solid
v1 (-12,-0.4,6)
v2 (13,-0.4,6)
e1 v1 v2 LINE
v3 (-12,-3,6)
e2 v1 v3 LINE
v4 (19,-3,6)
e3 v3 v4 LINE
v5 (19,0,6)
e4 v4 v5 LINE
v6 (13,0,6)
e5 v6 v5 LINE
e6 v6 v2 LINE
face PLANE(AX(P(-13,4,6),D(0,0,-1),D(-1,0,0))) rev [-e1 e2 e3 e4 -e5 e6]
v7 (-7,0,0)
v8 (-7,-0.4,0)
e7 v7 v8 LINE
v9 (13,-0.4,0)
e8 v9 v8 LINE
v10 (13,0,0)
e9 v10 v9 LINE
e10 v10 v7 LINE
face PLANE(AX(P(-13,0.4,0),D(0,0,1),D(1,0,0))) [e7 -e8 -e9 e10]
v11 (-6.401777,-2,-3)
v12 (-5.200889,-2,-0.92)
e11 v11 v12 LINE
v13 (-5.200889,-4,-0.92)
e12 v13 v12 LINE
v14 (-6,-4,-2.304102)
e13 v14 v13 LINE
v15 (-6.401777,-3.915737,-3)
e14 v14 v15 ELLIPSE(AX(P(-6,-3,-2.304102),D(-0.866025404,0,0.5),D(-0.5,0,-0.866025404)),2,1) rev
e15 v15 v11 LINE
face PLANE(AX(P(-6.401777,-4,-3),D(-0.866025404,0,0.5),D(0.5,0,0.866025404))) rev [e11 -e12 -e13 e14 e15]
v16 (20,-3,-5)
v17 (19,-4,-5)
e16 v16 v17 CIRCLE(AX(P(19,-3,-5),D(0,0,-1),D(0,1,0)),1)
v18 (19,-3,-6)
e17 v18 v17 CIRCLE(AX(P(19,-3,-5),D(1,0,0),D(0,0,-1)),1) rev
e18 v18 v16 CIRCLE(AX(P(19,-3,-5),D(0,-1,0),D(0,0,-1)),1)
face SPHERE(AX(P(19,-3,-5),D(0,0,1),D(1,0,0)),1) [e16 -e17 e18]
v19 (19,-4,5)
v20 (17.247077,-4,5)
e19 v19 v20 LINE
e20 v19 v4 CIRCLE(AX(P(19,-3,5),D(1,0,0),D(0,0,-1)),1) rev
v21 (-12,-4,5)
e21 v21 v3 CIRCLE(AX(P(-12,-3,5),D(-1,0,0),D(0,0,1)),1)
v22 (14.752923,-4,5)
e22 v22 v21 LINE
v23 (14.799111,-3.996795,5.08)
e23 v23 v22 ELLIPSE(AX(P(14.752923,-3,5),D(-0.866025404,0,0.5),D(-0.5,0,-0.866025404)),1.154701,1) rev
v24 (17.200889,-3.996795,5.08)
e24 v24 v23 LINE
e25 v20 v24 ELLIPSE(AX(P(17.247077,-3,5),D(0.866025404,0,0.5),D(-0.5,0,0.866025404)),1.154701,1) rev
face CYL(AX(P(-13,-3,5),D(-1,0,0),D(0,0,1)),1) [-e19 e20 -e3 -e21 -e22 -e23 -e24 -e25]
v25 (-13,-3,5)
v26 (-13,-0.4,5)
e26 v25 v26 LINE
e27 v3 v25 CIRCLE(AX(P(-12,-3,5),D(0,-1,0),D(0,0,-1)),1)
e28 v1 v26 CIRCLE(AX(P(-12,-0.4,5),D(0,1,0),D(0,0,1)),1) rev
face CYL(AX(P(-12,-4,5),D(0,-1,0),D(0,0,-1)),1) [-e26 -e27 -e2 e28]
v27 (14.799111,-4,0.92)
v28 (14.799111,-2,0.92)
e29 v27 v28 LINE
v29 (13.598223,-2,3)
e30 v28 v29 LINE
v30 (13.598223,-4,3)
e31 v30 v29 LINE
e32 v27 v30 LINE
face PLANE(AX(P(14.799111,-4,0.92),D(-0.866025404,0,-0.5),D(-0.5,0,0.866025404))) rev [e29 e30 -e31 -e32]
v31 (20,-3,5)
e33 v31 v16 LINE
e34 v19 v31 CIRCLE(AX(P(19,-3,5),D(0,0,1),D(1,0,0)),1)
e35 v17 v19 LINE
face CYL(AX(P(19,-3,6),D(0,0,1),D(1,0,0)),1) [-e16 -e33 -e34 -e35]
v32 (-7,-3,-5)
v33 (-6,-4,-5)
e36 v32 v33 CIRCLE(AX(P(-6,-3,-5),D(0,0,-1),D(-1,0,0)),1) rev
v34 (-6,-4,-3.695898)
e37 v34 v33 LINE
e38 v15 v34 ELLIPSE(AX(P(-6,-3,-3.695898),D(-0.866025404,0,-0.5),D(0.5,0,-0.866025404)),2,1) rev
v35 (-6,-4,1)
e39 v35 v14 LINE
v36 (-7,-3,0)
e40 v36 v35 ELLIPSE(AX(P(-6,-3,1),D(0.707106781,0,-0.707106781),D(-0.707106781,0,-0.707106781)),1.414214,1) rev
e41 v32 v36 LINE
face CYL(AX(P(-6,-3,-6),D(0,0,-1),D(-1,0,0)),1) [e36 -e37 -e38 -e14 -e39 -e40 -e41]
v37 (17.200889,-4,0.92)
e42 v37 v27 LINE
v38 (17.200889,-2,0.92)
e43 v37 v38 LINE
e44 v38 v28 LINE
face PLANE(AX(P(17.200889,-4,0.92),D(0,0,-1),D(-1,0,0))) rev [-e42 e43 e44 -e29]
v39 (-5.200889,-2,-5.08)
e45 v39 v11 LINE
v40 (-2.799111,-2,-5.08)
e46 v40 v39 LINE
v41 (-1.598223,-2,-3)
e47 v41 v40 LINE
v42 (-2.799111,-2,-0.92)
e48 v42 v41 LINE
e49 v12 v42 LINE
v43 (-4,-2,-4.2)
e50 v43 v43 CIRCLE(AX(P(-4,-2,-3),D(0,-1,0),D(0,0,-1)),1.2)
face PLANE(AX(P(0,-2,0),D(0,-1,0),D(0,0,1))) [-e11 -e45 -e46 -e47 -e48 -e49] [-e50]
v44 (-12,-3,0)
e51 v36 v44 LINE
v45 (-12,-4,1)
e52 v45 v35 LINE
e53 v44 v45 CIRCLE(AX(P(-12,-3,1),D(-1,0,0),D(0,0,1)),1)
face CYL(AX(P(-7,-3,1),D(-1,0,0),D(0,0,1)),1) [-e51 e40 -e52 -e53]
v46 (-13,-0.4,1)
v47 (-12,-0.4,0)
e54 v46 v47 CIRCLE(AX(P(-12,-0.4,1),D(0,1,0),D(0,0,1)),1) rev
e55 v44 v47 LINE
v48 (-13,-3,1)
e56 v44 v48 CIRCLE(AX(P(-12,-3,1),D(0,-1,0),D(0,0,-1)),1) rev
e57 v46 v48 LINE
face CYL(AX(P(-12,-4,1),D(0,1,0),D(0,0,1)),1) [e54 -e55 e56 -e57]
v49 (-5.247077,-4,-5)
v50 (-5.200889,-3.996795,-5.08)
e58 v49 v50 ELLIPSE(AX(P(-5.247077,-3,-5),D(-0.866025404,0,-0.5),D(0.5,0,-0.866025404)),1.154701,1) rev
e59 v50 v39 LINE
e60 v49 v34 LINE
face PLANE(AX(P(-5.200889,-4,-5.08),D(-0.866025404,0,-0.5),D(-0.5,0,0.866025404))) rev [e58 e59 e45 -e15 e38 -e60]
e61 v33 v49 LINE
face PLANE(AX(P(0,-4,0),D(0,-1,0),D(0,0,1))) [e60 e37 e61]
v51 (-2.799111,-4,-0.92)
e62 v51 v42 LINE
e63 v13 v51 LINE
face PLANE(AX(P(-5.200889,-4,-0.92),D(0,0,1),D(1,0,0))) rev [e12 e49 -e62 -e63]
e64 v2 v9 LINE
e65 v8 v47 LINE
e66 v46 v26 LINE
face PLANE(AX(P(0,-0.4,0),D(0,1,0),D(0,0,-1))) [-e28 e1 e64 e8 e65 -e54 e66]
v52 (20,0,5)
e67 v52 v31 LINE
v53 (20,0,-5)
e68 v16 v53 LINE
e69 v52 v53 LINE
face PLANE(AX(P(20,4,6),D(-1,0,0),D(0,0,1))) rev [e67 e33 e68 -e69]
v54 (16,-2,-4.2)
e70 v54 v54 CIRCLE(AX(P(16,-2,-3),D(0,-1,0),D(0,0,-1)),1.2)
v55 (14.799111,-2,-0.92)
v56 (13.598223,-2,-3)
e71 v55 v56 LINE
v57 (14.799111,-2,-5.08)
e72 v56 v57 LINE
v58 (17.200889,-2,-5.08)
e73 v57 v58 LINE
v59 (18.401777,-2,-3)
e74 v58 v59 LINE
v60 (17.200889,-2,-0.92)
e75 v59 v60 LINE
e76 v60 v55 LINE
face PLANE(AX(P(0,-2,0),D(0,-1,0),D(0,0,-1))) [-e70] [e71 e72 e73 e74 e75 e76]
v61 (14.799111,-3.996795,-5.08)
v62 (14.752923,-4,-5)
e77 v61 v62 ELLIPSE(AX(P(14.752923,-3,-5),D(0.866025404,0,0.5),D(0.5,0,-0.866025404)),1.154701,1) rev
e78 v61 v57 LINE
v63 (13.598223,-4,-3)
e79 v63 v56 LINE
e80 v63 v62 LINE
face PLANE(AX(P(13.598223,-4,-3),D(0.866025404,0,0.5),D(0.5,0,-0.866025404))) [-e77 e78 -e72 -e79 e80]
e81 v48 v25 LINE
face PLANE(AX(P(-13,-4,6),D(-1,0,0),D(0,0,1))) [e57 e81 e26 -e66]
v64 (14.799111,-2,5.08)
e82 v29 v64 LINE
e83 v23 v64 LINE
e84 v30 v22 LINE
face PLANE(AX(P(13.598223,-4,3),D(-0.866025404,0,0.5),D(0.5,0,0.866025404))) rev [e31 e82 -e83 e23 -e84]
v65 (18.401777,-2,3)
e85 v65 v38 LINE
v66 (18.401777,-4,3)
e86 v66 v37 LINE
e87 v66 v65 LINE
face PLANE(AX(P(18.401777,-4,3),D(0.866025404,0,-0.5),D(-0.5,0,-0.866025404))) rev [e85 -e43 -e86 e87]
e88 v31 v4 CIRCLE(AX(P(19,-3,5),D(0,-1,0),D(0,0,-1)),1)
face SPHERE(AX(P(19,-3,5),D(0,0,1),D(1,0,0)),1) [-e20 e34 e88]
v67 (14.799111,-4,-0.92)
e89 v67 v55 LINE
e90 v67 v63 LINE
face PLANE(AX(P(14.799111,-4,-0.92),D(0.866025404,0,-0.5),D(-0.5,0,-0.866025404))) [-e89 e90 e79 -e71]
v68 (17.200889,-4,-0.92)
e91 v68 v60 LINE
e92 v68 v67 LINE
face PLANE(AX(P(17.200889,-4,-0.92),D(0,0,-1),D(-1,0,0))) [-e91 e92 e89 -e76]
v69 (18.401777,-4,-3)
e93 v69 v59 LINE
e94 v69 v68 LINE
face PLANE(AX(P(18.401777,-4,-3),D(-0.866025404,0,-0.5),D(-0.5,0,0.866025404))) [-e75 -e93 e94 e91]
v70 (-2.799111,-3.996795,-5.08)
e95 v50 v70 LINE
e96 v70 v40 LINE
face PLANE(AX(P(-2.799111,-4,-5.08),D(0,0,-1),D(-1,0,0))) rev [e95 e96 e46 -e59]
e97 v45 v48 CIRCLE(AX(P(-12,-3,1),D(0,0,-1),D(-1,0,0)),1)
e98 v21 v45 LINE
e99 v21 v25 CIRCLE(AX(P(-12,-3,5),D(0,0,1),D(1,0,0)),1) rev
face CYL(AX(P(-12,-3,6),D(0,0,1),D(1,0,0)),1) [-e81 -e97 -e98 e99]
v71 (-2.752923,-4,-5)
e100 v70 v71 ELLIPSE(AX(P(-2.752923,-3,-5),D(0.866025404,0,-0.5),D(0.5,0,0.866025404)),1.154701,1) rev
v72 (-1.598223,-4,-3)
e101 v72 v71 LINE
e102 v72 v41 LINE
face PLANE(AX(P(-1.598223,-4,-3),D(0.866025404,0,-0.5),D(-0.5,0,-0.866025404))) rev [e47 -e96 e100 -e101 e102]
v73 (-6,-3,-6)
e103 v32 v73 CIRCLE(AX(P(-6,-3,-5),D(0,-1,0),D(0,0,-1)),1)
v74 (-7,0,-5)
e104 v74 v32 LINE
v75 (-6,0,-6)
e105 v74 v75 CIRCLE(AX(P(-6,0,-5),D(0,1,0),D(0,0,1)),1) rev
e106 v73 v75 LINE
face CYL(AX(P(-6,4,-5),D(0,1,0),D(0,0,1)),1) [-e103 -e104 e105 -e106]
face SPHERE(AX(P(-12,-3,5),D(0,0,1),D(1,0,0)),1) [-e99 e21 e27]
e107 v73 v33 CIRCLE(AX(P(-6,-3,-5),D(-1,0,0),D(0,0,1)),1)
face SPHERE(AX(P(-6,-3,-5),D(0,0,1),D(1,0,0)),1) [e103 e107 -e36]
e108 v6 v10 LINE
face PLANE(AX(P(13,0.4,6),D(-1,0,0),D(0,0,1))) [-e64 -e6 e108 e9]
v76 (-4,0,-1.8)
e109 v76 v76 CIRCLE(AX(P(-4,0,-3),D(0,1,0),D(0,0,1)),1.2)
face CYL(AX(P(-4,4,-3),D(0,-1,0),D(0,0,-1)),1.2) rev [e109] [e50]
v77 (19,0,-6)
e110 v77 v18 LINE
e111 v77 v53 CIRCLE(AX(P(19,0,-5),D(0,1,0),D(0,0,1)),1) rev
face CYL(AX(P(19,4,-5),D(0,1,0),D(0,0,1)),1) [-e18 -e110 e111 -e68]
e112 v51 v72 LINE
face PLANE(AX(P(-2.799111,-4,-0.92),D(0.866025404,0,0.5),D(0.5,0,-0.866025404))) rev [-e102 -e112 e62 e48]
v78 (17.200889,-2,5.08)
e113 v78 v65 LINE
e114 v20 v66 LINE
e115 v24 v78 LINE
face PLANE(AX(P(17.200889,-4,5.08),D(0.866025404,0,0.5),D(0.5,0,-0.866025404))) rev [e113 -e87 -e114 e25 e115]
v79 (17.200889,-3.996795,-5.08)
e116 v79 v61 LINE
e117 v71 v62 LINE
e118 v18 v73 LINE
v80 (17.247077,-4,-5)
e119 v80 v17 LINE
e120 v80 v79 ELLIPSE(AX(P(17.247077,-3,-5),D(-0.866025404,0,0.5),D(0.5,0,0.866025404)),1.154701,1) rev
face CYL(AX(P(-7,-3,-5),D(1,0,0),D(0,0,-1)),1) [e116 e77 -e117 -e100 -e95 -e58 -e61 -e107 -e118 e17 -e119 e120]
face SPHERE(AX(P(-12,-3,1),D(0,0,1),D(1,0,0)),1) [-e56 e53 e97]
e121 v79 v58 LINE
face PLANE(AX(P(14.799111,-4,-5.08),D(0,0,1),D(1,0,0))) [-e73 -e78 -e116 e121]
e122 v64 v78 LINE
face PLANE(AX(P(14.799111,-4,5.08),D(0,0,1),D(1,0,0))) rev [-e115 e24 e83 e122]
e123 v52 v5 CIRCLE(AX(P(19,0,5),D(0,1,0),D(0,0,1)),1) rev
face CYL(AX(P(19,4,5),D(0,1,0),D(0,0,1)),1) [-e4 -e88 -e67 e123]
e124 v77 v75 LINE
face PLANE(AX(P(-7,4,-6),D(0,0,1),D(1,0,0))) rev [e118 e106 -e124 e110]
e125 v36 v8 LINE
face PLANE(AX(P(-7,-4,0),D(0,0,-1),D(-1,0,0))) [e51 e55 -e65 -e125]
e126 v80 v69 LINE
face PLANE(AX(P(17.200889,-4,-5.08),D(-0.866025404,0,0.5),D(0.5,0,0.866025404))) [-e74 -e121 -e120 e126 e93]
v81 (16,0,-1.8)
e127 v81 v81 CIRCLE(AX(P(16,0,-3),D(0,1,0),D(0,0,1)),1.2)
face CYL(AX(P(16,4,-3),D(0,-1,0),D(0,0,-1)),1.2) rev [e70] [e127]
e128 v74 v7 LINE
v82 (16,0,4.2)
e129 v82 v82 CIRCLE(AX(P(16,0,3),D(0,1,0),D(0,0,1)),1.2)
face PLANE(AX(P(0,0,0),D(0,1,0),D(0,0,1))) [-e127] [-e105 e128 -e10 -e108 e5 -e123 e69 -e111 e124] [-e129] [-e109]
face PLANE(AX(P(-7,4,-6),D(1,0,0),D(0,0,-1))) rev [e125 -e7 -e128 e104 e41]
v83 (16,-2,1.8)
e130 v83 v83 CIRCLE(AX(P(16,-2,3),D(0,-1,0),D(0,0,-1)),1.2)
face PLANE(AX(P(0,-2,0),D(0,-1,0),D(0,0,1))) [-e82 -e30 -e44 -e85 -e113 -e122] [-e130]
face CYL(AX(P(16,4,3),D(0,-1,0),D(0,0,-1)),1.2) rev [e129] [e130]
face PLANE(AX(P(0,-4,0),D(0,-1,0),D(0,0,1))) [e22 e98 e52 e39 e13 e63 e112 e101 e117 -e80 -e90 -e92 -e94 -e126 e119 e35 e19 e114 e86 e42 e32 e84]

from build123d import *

# Parameters (mm, degrees)
EXTRUDE_1_DEPTH        = 4
CUT_EXTRUDE_START      = 2
CUT_EXTRUDE_2_DEPTH    = 2
CUT_EXTRUDE_3_DEPTH    = 2
SKETCH_4_R             = 1.2
CUT_EXTRUDE_4_DEPTH    = 22.260291625
FILLET_1_R             = 1
SKETCH_6_W             = 26
SKETCH_6_H             = 6
CUT_EXTRUDE_8_DEPTH    = 0.4
MIRROR_START           = 2
MIRROR_2_COPY_1_DEPTH  = 2
FILLET_1_OF_MIRROR_2_R = 1
SKETCH_8_W             = 60.520940054
SKETCH_8_H             = 38.044112249
CUT_EXTRUDE_10_DEPTH   = 26


with BuildPart() as part:
    # 草圖1 → 填料-伸長1 (new body)
    with BuildSketch(Plane(origin=(0, 0, 0), x_dir=(1, 0, 0), z_dir=(0, 1, 0))):
        Polygon((-13, -6), (20, -6), (20, 6), (-7, 6), (-7, 0), (-13, 0), align=None)
    extrude_1 = extrude(amount=EXTRUDE_1_DEPTH)

    # 草圖2 → 除料-伸長2 (cut)
    with BuildSketch(Plane(origin=(0, 0, 0), x_dir=(1, 0, 0), z_dir=(0, 1, 0)).offset(CUT_EXTRUDE_START)):
        Polygon((-1.59822288, 3), (-2.79911144, 5.08), (-5.20088856, 5.08), (-6.40177712, 3), (-5.20088856, 0.92), (-2.79911144, 0.92), align=None)
    cut_extrude_2 = extrude(amount=CUT_EXTRUDE_2_DEPTH, mode=Mode.SUBTRACT)

    # 草圖3 → 除料-伸長3 (cut)
    with BuildSketch(Plane(origin=(0, 0, 0), x_dir=(1, 0, 0), z_dir=(0, 1, 0)).offset(CUT_EXTRUDE_START)):
        Polygon((13.59822288, -3), (14.79911144, -5.08), (17.20088856, -5.08), (18.40177712, -3), (17.20088856, -0.92), (14.79911144, -0.92), align=None)
    cut_extrude_3 = extrude(amount=CUT_EXTRUDE_3_DEPTH, mode=Mode.SUBTRACT)

    # 草圖4 → 除料-伸長4 (cut, through all)
    with BuildSketch(Plane(origin=(0, 0, 0), x_dir=(1, 0, 0), z_dir=(0, 1, 0))):
        with Locations(Location((-4, 3, 0), (0, 0, 270))):
            Circle(SKETCH_4_R)
        with Locations(Location((16, 3, 0), (0, 0, 90))):
            Circle(SKETCH_4_R)
        with Locations(Location((16, -3, 0), (0, 0, 270))):
            Circle(SKETCH_4_R)
    cut_extrude_4 = extrude(amount=CUT_EXTRUDE_4_DEPTH, mode=Mode.SUBTRACT)

    # 圓角1
    # the kernel refuses this fillet: 1 mm, written as the material it takes off along each edge
    with BuildSketch(Plane(origin=(-6, 3, -5), x_dir=(0, 0, -1), z_dir=(0, 1, 0))) as fillet_1_piece_1_section:
        Polygon((0, 0), (FILLET_1_R, 0), (FILLET_1_R, FILLET_1_R), (0, FILLET_1_R), align=None)
    fillet_1_piece_1 = extrude(amount=FILLET_1_R, mode=Mode.PRIVATE)
    fillet_1_piece_1 = fillet_1_piece_1 - Plane(origin=(-6, 3, -5), x_dir=(0.7071067811865476, 0, 0.7071067811865474), z_dir=(0, 1, 0)) * Sphere(FILLET_1_R, mode=Mode.PRIVATE)
    add(fillet_1_piece_1, mode=Mode.SUBTRACT)
    with BuildSketch(Plane(origin=(-12, 3, 1), x_dir=(0, 1, 0), z_dir=(-1, 0, 0))) as fillet_1_piece_2_section:
        Polygon((0, 0), (FILLET_1_R, 0), (FILLET_1_R, FILLET_1_R), (0, FILLET_1_R), align=None)
    fillet_1_piece_2 = extrude(amount=FILLET_1_R, mode=Mode.PRIVATE)
    fillet_1_piece_2 = fillet_1_piece_2 - Plane(origin=(-12, 3, 1), x_dir=(0, -0.7071067811865475, 0.7071067811865475), z_dir=(-1, 0, 0)) * Sphere(FILLET_1_R, mode=Mode.PRIVATE)
    add(fillet_1_piece_2, mode=Mode.SUBTRACT)
    with BuildSketch(Plane(origin=(-12, 3, 5), x_dir=(-1, 0, 0), z_dir=(0, 0, 1))) as fillet_1_piece_3_section:
        Polygon((0, 0), (FILLET_1_R, 0), (FILLET_1_R, -FILLET_1_R), (0, -FILLET_1_R), align=None)
    fillet_1_piece_3 = extrude(amount=FILLET_1_R, mode=Mode.PRIVATE)
    fillet_1_piece_3 = fillet_1_piece_3 - Plane(origin=(-12, 3, 5), x_dir=(0.7071067811865475, -0.7071067811865475, 0), z_dir=(0, 0, 1)) * Sphere(FILLET_1_R, mode=Mode.PRIVATE)
    add(fillet_1_piece_3, mode=Mode.SUBTRACT)
    with BuildSketch(Plane(origin=(19, 3, 5), x_dir=(1, 0, 0), z_dir=(0, 0, 1))) as fillet_1_piece_4_section:
        Polygon((0, 0), (FILLET_1_R, 0), (FILLET_1_R, FILLET_1_R), (0, FILLET_1_R), align=None)
    fillet_1_piece_4 = extrude(amount=FILLET_1_R, mode=Mode.PRIVATE)
    fillet_1_piece_4 = fillet_1_piece_4 - Plane(origin=(19, 3, 5), x_dir=(-0.7071067811865475, -0.7071067811865475, 0), z_dir=(0, 0, 1)) * Sphere(FILLET_1_R, mode=Mode.PRIVATE)
    add(fillet_1_piece_4, mode=Mode.SUBTRACT)
    with BuildSketch(Plane(origin=(19, 3, -5), x_dir=(0, 1, 0), z_dir=(1, 0, 0))) as fillet_1_piece_5_section:
        Polygon((0, 0), (FILLET_1_R, 0), (FILLET_1_R, -FILLET_1_R), (0, -FILLET_1_R), align=None)
    fillet_1_piece_5 = extrude(amount=FILLET_1_R, mode=Mode.PRIVATE)
    fillet_1_piece_5 = fillet_1_piece_5 - Plane(origin=(19, 3, -5), x_dir=(0, -0.7071067811865475, 0.7071067811865475), z_dir=(1, 0, 0)) * Sphere(FILLET_1_R, mode=Mode.PRIVATE)
    add(fillet_1_piece_5, mode=Mode.SUBTRACT)
    with BuildSketch(Plane(origin=(-7, 4, -5), x_dir=(1, 0, 0), z_dir=(0, 0, 1)), Plane(origin=(-7, 4, 0), x_dir=(0, 0, 1), z_dir=(-1, 0, 0))) as fillet_1_piece_6:
        with BuildLine():
            CenterArc((FILLET_1_R, -FILLET_1_R), FILLET_1_R, 90, 90)
            Line((0, -FILLET_1_R), (0, 0))
            Line((0, 0), (FILLET_1_R, 0))
        make_face()
    extrude(amount=5, mode=Mode.SUBTRACT)
    with BuildSketch(Plane(origin=(-13, 4, 1), x_dir=(0, -1, 0), z_dir=(0, 0, 1))) as fillet_1_piece_7:
        with BuildLine():
            CenterArc((FILLET_1_R, FILLET_1_R), FILLET_1_R, 180, 90)
            Line((0, FILLET_1_R), (0, 0))
            Line((0, 0), (FILLET_1_R, 0))
        make_face()
    extrude(amount=4, mode=Mode.SUBTRACT)
    with BuildSketch(Plane(origin=(-12, 4, 6), x_dir=(0, -1, 0), z_dir=(1, 0, 0))) as fillet_1_piece_8:
        with BuildLine():
            CenterArc((FILLET_1_R, FILLET_1_R), FILLET_1_R, 180, 90)
            Line((0, FILLET_1_R), (0, 0))
            Line((0, 0), (FILLET_1_R, 0))
        make_face()
    extrude(amount=31, mode=Mode.SUBTRACT)
    with BuildSketch(Plane(origin=(20, 4, 5), x_dir=(0, -1, 0), z_dir=(0, 0, -1))) as fillet_1_piece_9:
        with BuildLine():
            CenterArc((FILLET_1_R, FILLET_1_R), FILLET_1_R, 180, 90)
            Line((0, FILLET_1_R), (0, 0))
            Line((0, 0), (FILLET_1_R, 0))
        make_face()
    extrude(amount=10, mode=Mode.SUBTRACT)
    with BuildSketch(Plane(origin=(19, 4, -6), x_dir=(0, 0, 1), z_dir=(-1, 0, 0))) as fillet_1_piece_10:
        with BuildLine():
            CenterArc((FILLET_1_R, -FILLET_1_R), FILLET_1_R, 90, 90)
            Line((0, -FILLET_1_R), (0, 0))
            Line((0, 0), (FILLET_1_R, 0))
        make_face()
    extrude(amount=25, mode=Mode.SUBTRACT)
    with BuildSketch(Plane(origin=(-13, -2.5, 0), x_dir=(0, 0, 1), z_dir=(0, 1, 0)), Plane(origin=(-13, -2.5, 6), x_dir=(1, 0, 0), z_dir=(0, 1, 0))) as fillet_1_piece_11:
        with BuildLine():
            CenterArc((FILLET_1_R, FILLET_1_R), FILLET_1_R, 180, 90)
            Line((0, FILLET_1_R), (0, 0))
            Line((0, 0), (FILLET_1_R, 0))
        make_face()
    extrude(amount=5.5, mode=Mode.SUBTRACT)
    with BuildSketch(Plane(origin=(20, -2.5, 6), x_dir=(-1, 0, 0), z_dir=(0, 1, 0)), Plane(origin=(20, -2.5, -6), x_dir=(0, 0, 1), z_dir=(0, 1, 0)), Plane(origin=(-7, -2.5, -6), x_dir=(1, 0, 0), z_dir=(0, 1, 0))) as fillet_1_piece_12:
        with BuildLine():
            CenterArc((FILLET_1_R, -FILLET_1_R), FILLET_1_R, 90, 90)
            Line((0, -FILLET_1_R), (0, 0))
            Line((0, 0), (FILLET_1_R, 0))
        make_face()
    extrude(amount=5.5, mode=Mode.SUBTRACT)
    with BuildSketch(Plane(origin=(-4.5, 4, 0), x_dir=(0, 0, 1), z_dir=(-1, 0, 0))) as fillet_1_piece_13a_section:
        with BuildLine():
            CenterArc((FILLET_1_R, -FILLET_1_R), FILLET_1_R, 90, 90)
            Line((0, -FILLET_1_R), (0, 0))
            Line((0, 0), (FILLET_1_R, 0))
        make_face()
    fillet_1_piece_13a = extrude(amount=7.5, mode=Mode.PRIVATE)
    fillet_1_piece_13a = split(fillet_1_piece_13a, bisect_by=Plane(origin=(-7, 3.773604886, 0.226395114), z_dir=(1, 0, 0)), keep=Keep.TOP, mode=Mode.PRIVATE)
    with BuildSketch(Plane(origin=(-7, 4, -5), x_dir=(1, 0, 0), z_dir=(0, 0, 1))) as fillet_1_piece_13b_section:
        with BuildLine():
            CenterArc((FILLET_1_R, -FILLET_1_R), FILLET_1_R, 90, 90)
            Line((0, -FILLET_1_R), (0, 0))
            Line((0, 0), (FILLET_1_R, 0))
        make_face()
    fillet_1_piece_13b = extrude(amount=7.5, mode=Mode.PRIVATE)
    fillet_1_piece_13b = split(fillet_1_piece_13b, bisect_by=Plane(origin=(-6.773604886, 3.773604886, 0), z_dir=(0, 0, 1)), keep=Keep.TOP, mode=Mode.PRIVATE)
    fillet_1_piece_13 = fillet_1_piece_13a & fillet_1_piece_13b
    add(fillet_1_piece_13, mode=Mode.SUBTRACT)

    # 草圖6 → 除料-伸長8 (cut)
    with BuildSketch(Plane(origin=(0, 0, 0), x_dir=(1, 0, 0), z_dir=(0, 1, 0))):
        with Locations((0, -3)):
            Rectangle(SKETCH_6_W, SKETCH_6_H)
    cut_extrude_8 = extrude(amount=CUT_EXTRUDE_8_DEPTH, mode=Mode.SUBTRACT)

    # 鏡射3: 除料-伸長3 across plane
    add(cut_extrude_3.mirror(Plane(origin=(-7, 4, 0), x_dir=(1, 0, 0), z_dir=(0, 0, 1))), mode=Mode.SUBTRACT)

    # 鏡射2: 填料-伸長1, 除料-伸長2, 除料-伸長3, 除料-伸長4, 除料-伸長8 across plane
    add(extrude_1.mirror(Plane.ZX))
    add(cut_extrude_2.mirror(Plane.ZX), mode=Mode.SUBTRACT)
    add(cut_extrude_3.mirror(Plane.ZX), mode=Mode.SUBTRACT)
    add(cut_extrude_4.mirror(Plane.ZX), mode=Mode.SUBTRACT)
    add(cut_extrude_8.mirror(Plane.ZX), mode=Mode.SUBTRACT)

    # 鏡射2 copy 1 sketch → 鏡射2 copy 1 (cut)
    with BuildSketch(Plane.XZ.offset(MIRROR_START)):
        Polygon((13.59822288, -3), (14.79911144, -5.08), (17.20088856, -5.08), (18.40177712, -3), (17.20088856, -0.92), (14.79911144, -0.92), align=None)
    extrude(amount=MIRROR_2_COPY_1_DEPTH, mode=Mode.SUBTRACT)

    # 圓角1 of 鏡射2
    # the kernel refuses this fillet: 1 mm, written as the material it takes off along each edge
    with BuildSketch(Plane(origin=(-6, -3, -5), x_dir=(0, -1, 0), z_dir=(-1, 0, 0))) as fillet_1_of_mirror_2_piece_1_section:
        Polygon((0, 0), (FILLET_1_OF_MIRROR_2_R, 0), (FILLET_1_OF_MIRROR_2_R, -FILLET_1_OF_MIRROR_2_R), (0, -FILLET_1_OF_MIRROR_2_R), align=None)
    fillet_1_of_mirror_2_piece_1 = extrude(amount=FILLET_1_OF_MIRROR_2_R, mode=Mode.PRIVATE)
    fillet_1_of_mirror_2_piece_1 = fillet_1_of_mirror_2_piece_1 - Plane(origin=(-6, -3, -5), x_dir=(0, 0.7071067811865475, 0.7071067811865475), z_dir=(-1, 0, 0)) * Sphere(FILLET_1_OF_MIRROR_2_R, mode=Mode.PRIVATE)
    add(fillet_1_of_mirror_2_piece_1, mode=Mode.SUBTRACT)
    with BuildSketch(Plane(origin=(-12, -3, 1), x_dir=(0, -1, 0), z_dir=(0, 0, -1))) as fillet_1_of_mirror_2_piece_2_section:
        Polygon((0, 0), (FILLET_1_OF_MIRROR_2_R, 0), (FILLET_1_OF_MIRROR_2_R, FILLET_1_OF_MIRROR_2_R), (0, FILLET_1_OF_MIRROR_2_R), align=None)
    fillet_1_of_mirror_2_piece_2 = extrude(amount=FILLET_1_OF_MIRROR_2_R, mode=Mode.PRIVATE)
    fillet_1_of_mirror_2_piece_2 = fillet_1_of_mirror_2_piece_2 - Plane(origin=(-12, -3, 1), x_dir=(0.7071067811865475, 0.7071067811865475, 0), z_dir=(0, 0, -1)) * Sphere(FILLET_1_OF_MIRROR_2_R, mode=Mode.PRIVATE)
    add(fillet_1_of_mirror_2_piece_2, mode=Mode.SUBTRACT)
    with BuildSketch(Plane(origin=(-12, -3, 5), x_dir=(0, -1, 0), z_dir=(0, 0, 1))) as fillet_1_of_mirror_2_piece_3_section:
        Polygon((0, 0), (FILLET_1_OF_MIRROR_2_R, 0), (FILLET_1_OF_MIRROR_2_R, -FILLET_1_OF_MIRROR_2_R), (0, -FILLET_1_OF_MIRROR_2_R), align=None)
    fillet_1_of_mirror_2_piece_3 = extrude(amount=FILLET_1_OF_MIRROR_2_R, mode=Mode.PRIVATE)
    fillet_1_of_mirror_2_piece_3 = fillet_1_of_mirror_2_piece_3 - Plane(origin=(-12, -3, 5), x_dir=(0.7071067811865475, 0.7071067811865475, 0), z_dir=(0, 0, 1)) * Sphere(FILLET_1_OF_MIRROR_2_R, mode=Mode.PRIVATE)
    add(fillet_1_of_mirror_2_piece_3, mode=Mode.SUBTRACT)
    with BuildSketch(Plane(origin=(19, -3, 5), x_dir=(1, 0, 0), z_dir=(0, 0, 1))) as fillet_1_of_mirror_2_piece_4_section:
        Polygon((0, 0), (FILLET_1_OF_MIRROR_2_R, 0), (FILLET_1_OF_MIRROR_2_R, -FILLET_1_OF_MIRROR_2_R), (0, -FILLET_1_OF_MIRROR_2_R), align=None)
    fillet_1_of_mirror_2_piece_4 = extrude(amount=FILLET_1_OF_MIRROR_2_R, mode=Mode.PRIVATE)
    fillet_1_of_mirror_2_piece_4 = fillet_1_of_mirror_2_piece_4 - Plane(origin=(19, -3, 5), x_dir=(-0.7071067811865475, 0.7071067811865475, 0), z_dir=(0, 0, 1)) * Sphere(FILLET_1_OF_MIRROR_2_R, mode=Mode.PRIVATE)
    add(fillet_1_of_mirror_2_piece_4, mode=Mode.SUBTRACT)
    with BuildSketch(Plane(origin=(19, -3, -5), x_dir=(0, -1, 0), z_dir=(1, 0, 0))) as fillet_1_of_mirror_2_piece_5_section:
        Polygon((0, 0), (FILLET_1_OF_MIRROR_2_R, 0), (FILLET_1_OF_MIRROR_2_R, FILLET_1_OF_MIRROR_2_R), (0, FILLET_1_OF_MIRROR_2_R), align=None)
    fillet_1_of_mirror_2_piece_5 = extrude(amount=FILLET_1_OF_MIRROR_2_R, mode=Mode.PRIVATE)
    fillet_1_of_mirror_2_piece_5 = fillet_1_of_mirror_2_piece_5 - Plane(origin=(19, -3, -5), x_dir=(0, 0.7071067811865475, 0.7071067811865475), z_dir=(1, 0, 0)) * Sphere(FILLET_1_OF_MIRROR_2_R, mode=Mode.PRIVATE)
    add(fillet_1_of_mirror_2_piece_5, mode=Mode.SUBTRACT)
    with BuildSketch(Plane(origin=(-7, -4, -5), x_dir=(1, 0, 0), z_dir=(0, 0, 1)), Plane(origin=(-7, -4, 0), x_dir=(0, 0, 1), z_dir=(-1, 0, 0))) as fillet_1_of_mirror_2_piece_6:
        with BuildLine():
            CenterArc((FILLET_1_OF_MIRROR_2_R, FILLET_1_OF_MIRROR_2_R), FILLET_1_OF_MIRROR_2_R, 180, 90)
            Line((0, FILLET_1_OF_MIRROR_2_R), (0, 0))
            Line((0, 0), (FILLET_1_OF_MIRROR_2_R, 0))
        make_face()
    extrude(amount=5, mode=Mode.SUBTRACT)
    with BuildSketch(Plane(origin=(-13, -4, 1), x_dir=(1, 0, 0), z_dir=(0, 0, 1))) as fillet_1_of_mirror_2_piece_7:
        with BuildLine():
            CenterArc((FILLET_1_OF_MIRROR_2_R, FILLET_1_OF_MIRROR_2_R), FILLET_1_OF_MIRROR_2_R, 180, 90)
            Line((0, FILLET_1_OF_MIRROR_2_R), (0, 0))
            Line((0, 0), (FILLET_1_OF_MIRROR_2_R, 0))
        make_face()
    extrude(amount=4, mode=Mode.SUBTRACT)
    with BuildSketch(Plane(origin=(-12, -4, 6), x_dir=(0, 1, 0), z_dir=(1, 0, 0))) as fillet_1_of_mirror_2_piece_8:
        with BuildLine():
            CenterArc((FILLET_1_OF_MIRROR_2_R, -FILLET_1_OF_MIRROR_2_R), FILLET_1_OF_MIRROR_2_R, 90, 90)
            Line((0, -FILLET_1_OF_MIRROR_2_R), (0, 0))
            Line((0, 0), (FILLET_1_OF_MIRROR_2_R, 0))
        make_face()
    extrude(amount=31, mode=Mode.SUBTRACT)
    with BuildSketch(Plane(origin=(20, -4, 5), x_dir=(0, 1, 0), z_dir=(0, 0, -1))) as fillet_1_of_mirror_2_piece_9:
        with BuildLine():
            CenterArc((FILLET_1_OF_MIRROR_2_R, -FILLET_1_OF_MIRROR_2_R), FILLET_1_OF_MIRROR_2_R, 90, 90)
            Line((0, -FILLET_1_OF_MIRROR_2_R), (0, 0))
            Line((0, 0), (FILLET_1_OF_MIRROR_2_R, 0))
        make_face()
    extrude(amount=10, mode=Mode.SUBTRACT)
    with BuildSketch(Plane(origin=(19, -4, -6), x_dir=(0, 0, 1), z_dir=(-1, 0, 0))) as fillet_1_of_mirror_2_piece_10:
        with BuildLine():
            CenterArc((FILLET_1_OF_MIRROR_2_R, FILLET_1_OF_MIRROR_2_R), FILLET_1_OF_MIRROR_2_R, 180, 90)
            Line((0, FILLET_1_OF_MIRROR_2_R), (0, 0))
            Line((0, 0), (FILLET_1_OF_MIRROR_2_R, 0))
        make_face()
    extrude(amount=25, mode=Mode.SUBTRACT)
    with BuildSketch(Plane(origin=(-13, 2.1, 0), x_dir=(0, 0, 1), z_dir=(0, -1, 0)), Plane(origin=(-13, 2.1, 6), x_dir=(1, 0, 0), z_dir=(0, -1, 0))) as fillet_1_of_mirror_2_piece_11:
        with BuildLine():
            CenterArc((FILLET_1_OF_MIRROR_2_R, -FILLET_1_OF_MIRROR_2_R), FILLET_1_OF_MIRROR_2_R, 90, 90)
            Line((0, -FILLET_1_OF_MIRROR_2_R), (0, 0))
            Line((0, 0), (FILLET_1_OF_MIRROR_2_R, 0))
        make_face()
    extrude(amount=5.1, mode=Mode.SUBTRACT)
    with BuildSketch(Plane(origin=(20, 2.5, 6), x_dir=(-1, 0, 0), z_dir=(0, -1, 0)), Plane(origin=(20, 2.5, -6), x_dir=(0, 0, 1), z_dir=(0, -1, 0)), Plane(origin=(-7, 2.5, -6), x_dir=(1, 0, 0), z_dir=(0, -1, 0))) as fillet_1_of_mirror_2_piece_12:
        with BuildLine():
            CenterArc((FILLET_1_OF_MIRROR_2_R, FILLET_1_OF_MIRROR_2_R), FILLET_1_OF_MIRROR_2_R, 180, 90)
            Line((0, FILLET_1_OF_MIRROR_2_R), (0, 0))
            Line((0, 0), (FILLET_1_OF_MIRROR_2_R, 0))
        make_face()
    extrude(amount=5.5, mode=Mode.SUBTRACT)
    with BuildSketch(Plane(origin=(-4.5, -4, 0), x_dir=(0, 0, 1), z_dir=(-1, 0, 0))) as fillet_1_of_mirror_2_piece_13a_section:
        with BuildLine():
            CenterArc((FILLET_1_OF_MIRROR_2_R, FILLET_1_OF_MIRROR_2_R), FILLET_1_OF_MIRROR_2_R, 180, 90)
            Line((0, FILLET_1_OF_MIRROR_2_R), (0, 0))
            Line((0, 0), (FILLET_1_OF_MIRROR_2_R, 0))
        make_face()
    fillet_1_of_mirror_2_piece_13a = extrude(amount=7.5, mode=Mode.PRIVATE)
    fillet_1_of_mirror_2_piece_13a = split(fillet_1_of_mirror_2_piece_13a, bisect_by=Plane(origin=(-7, -3.773604886, 0.226395114), z_dir=(1, 0, 0)), keep=Keep.TOP, mode=Mode.PRIVATE)
    with BuildSketch(Plane(origin=(-7, -4, -5), x_dir=(1, 0, 0), z_dir=(0, 0, 1))) as fillet_1_of_mirror_2_piece_13b_section:
        with BuildLine():
            CenterArc((FILLET_1_OF_MIRROR_2_R, FILLET_1_OF_MIRROR_2_R), FILLET_1_OF_MIRROR_2_R, 180, 90)
            Line((0, FILLET_1_OF_MIRROR_2_R), (0, 0))
            Line((0, 0), (FILLET_1_OF_MIRROR_2_R, 0))
        make_face()
    fillet_1_of_mirror_2_piece_13b = extrude(amount=7.5, mode=Mode.PRIVATE)
    fillet_1_of_mirror_2_piece_13b = split(fillet_1_of_mirror_2_piece_13b, bisect_by=Plane(origin=(-6.773604886, -3.773604886, 0), z_dir=(0, 0, 1)), keep=Keep.TOP, mode=Mode.PRIVATE)
    fillet_1_of_mirror_2_piece_13 = fillet_1_of_mirror_2_piece_13a & fillet_1_of_mirror_2_piece_13b
    add(fillet_1_of_mirror_2_piece_13, mode=Mode.SUBTRACT)

    # 草圖8 → 除料-伸長10 (cut)
    with BuildSketch(Plane(origin=(0, 0, 0), x_dir=(1, 0, 0), z_dir=(0, 1, 0))):
        with Locations((-0.399313798, 3.851597451)):
            Rectangle(SKETCH_8_W, SKETCH_8_H)
    extrude(amount=CUT_EXTRUDE_10_DEPTH, mode=Mode.SUBTRACT)


solid = part.part
